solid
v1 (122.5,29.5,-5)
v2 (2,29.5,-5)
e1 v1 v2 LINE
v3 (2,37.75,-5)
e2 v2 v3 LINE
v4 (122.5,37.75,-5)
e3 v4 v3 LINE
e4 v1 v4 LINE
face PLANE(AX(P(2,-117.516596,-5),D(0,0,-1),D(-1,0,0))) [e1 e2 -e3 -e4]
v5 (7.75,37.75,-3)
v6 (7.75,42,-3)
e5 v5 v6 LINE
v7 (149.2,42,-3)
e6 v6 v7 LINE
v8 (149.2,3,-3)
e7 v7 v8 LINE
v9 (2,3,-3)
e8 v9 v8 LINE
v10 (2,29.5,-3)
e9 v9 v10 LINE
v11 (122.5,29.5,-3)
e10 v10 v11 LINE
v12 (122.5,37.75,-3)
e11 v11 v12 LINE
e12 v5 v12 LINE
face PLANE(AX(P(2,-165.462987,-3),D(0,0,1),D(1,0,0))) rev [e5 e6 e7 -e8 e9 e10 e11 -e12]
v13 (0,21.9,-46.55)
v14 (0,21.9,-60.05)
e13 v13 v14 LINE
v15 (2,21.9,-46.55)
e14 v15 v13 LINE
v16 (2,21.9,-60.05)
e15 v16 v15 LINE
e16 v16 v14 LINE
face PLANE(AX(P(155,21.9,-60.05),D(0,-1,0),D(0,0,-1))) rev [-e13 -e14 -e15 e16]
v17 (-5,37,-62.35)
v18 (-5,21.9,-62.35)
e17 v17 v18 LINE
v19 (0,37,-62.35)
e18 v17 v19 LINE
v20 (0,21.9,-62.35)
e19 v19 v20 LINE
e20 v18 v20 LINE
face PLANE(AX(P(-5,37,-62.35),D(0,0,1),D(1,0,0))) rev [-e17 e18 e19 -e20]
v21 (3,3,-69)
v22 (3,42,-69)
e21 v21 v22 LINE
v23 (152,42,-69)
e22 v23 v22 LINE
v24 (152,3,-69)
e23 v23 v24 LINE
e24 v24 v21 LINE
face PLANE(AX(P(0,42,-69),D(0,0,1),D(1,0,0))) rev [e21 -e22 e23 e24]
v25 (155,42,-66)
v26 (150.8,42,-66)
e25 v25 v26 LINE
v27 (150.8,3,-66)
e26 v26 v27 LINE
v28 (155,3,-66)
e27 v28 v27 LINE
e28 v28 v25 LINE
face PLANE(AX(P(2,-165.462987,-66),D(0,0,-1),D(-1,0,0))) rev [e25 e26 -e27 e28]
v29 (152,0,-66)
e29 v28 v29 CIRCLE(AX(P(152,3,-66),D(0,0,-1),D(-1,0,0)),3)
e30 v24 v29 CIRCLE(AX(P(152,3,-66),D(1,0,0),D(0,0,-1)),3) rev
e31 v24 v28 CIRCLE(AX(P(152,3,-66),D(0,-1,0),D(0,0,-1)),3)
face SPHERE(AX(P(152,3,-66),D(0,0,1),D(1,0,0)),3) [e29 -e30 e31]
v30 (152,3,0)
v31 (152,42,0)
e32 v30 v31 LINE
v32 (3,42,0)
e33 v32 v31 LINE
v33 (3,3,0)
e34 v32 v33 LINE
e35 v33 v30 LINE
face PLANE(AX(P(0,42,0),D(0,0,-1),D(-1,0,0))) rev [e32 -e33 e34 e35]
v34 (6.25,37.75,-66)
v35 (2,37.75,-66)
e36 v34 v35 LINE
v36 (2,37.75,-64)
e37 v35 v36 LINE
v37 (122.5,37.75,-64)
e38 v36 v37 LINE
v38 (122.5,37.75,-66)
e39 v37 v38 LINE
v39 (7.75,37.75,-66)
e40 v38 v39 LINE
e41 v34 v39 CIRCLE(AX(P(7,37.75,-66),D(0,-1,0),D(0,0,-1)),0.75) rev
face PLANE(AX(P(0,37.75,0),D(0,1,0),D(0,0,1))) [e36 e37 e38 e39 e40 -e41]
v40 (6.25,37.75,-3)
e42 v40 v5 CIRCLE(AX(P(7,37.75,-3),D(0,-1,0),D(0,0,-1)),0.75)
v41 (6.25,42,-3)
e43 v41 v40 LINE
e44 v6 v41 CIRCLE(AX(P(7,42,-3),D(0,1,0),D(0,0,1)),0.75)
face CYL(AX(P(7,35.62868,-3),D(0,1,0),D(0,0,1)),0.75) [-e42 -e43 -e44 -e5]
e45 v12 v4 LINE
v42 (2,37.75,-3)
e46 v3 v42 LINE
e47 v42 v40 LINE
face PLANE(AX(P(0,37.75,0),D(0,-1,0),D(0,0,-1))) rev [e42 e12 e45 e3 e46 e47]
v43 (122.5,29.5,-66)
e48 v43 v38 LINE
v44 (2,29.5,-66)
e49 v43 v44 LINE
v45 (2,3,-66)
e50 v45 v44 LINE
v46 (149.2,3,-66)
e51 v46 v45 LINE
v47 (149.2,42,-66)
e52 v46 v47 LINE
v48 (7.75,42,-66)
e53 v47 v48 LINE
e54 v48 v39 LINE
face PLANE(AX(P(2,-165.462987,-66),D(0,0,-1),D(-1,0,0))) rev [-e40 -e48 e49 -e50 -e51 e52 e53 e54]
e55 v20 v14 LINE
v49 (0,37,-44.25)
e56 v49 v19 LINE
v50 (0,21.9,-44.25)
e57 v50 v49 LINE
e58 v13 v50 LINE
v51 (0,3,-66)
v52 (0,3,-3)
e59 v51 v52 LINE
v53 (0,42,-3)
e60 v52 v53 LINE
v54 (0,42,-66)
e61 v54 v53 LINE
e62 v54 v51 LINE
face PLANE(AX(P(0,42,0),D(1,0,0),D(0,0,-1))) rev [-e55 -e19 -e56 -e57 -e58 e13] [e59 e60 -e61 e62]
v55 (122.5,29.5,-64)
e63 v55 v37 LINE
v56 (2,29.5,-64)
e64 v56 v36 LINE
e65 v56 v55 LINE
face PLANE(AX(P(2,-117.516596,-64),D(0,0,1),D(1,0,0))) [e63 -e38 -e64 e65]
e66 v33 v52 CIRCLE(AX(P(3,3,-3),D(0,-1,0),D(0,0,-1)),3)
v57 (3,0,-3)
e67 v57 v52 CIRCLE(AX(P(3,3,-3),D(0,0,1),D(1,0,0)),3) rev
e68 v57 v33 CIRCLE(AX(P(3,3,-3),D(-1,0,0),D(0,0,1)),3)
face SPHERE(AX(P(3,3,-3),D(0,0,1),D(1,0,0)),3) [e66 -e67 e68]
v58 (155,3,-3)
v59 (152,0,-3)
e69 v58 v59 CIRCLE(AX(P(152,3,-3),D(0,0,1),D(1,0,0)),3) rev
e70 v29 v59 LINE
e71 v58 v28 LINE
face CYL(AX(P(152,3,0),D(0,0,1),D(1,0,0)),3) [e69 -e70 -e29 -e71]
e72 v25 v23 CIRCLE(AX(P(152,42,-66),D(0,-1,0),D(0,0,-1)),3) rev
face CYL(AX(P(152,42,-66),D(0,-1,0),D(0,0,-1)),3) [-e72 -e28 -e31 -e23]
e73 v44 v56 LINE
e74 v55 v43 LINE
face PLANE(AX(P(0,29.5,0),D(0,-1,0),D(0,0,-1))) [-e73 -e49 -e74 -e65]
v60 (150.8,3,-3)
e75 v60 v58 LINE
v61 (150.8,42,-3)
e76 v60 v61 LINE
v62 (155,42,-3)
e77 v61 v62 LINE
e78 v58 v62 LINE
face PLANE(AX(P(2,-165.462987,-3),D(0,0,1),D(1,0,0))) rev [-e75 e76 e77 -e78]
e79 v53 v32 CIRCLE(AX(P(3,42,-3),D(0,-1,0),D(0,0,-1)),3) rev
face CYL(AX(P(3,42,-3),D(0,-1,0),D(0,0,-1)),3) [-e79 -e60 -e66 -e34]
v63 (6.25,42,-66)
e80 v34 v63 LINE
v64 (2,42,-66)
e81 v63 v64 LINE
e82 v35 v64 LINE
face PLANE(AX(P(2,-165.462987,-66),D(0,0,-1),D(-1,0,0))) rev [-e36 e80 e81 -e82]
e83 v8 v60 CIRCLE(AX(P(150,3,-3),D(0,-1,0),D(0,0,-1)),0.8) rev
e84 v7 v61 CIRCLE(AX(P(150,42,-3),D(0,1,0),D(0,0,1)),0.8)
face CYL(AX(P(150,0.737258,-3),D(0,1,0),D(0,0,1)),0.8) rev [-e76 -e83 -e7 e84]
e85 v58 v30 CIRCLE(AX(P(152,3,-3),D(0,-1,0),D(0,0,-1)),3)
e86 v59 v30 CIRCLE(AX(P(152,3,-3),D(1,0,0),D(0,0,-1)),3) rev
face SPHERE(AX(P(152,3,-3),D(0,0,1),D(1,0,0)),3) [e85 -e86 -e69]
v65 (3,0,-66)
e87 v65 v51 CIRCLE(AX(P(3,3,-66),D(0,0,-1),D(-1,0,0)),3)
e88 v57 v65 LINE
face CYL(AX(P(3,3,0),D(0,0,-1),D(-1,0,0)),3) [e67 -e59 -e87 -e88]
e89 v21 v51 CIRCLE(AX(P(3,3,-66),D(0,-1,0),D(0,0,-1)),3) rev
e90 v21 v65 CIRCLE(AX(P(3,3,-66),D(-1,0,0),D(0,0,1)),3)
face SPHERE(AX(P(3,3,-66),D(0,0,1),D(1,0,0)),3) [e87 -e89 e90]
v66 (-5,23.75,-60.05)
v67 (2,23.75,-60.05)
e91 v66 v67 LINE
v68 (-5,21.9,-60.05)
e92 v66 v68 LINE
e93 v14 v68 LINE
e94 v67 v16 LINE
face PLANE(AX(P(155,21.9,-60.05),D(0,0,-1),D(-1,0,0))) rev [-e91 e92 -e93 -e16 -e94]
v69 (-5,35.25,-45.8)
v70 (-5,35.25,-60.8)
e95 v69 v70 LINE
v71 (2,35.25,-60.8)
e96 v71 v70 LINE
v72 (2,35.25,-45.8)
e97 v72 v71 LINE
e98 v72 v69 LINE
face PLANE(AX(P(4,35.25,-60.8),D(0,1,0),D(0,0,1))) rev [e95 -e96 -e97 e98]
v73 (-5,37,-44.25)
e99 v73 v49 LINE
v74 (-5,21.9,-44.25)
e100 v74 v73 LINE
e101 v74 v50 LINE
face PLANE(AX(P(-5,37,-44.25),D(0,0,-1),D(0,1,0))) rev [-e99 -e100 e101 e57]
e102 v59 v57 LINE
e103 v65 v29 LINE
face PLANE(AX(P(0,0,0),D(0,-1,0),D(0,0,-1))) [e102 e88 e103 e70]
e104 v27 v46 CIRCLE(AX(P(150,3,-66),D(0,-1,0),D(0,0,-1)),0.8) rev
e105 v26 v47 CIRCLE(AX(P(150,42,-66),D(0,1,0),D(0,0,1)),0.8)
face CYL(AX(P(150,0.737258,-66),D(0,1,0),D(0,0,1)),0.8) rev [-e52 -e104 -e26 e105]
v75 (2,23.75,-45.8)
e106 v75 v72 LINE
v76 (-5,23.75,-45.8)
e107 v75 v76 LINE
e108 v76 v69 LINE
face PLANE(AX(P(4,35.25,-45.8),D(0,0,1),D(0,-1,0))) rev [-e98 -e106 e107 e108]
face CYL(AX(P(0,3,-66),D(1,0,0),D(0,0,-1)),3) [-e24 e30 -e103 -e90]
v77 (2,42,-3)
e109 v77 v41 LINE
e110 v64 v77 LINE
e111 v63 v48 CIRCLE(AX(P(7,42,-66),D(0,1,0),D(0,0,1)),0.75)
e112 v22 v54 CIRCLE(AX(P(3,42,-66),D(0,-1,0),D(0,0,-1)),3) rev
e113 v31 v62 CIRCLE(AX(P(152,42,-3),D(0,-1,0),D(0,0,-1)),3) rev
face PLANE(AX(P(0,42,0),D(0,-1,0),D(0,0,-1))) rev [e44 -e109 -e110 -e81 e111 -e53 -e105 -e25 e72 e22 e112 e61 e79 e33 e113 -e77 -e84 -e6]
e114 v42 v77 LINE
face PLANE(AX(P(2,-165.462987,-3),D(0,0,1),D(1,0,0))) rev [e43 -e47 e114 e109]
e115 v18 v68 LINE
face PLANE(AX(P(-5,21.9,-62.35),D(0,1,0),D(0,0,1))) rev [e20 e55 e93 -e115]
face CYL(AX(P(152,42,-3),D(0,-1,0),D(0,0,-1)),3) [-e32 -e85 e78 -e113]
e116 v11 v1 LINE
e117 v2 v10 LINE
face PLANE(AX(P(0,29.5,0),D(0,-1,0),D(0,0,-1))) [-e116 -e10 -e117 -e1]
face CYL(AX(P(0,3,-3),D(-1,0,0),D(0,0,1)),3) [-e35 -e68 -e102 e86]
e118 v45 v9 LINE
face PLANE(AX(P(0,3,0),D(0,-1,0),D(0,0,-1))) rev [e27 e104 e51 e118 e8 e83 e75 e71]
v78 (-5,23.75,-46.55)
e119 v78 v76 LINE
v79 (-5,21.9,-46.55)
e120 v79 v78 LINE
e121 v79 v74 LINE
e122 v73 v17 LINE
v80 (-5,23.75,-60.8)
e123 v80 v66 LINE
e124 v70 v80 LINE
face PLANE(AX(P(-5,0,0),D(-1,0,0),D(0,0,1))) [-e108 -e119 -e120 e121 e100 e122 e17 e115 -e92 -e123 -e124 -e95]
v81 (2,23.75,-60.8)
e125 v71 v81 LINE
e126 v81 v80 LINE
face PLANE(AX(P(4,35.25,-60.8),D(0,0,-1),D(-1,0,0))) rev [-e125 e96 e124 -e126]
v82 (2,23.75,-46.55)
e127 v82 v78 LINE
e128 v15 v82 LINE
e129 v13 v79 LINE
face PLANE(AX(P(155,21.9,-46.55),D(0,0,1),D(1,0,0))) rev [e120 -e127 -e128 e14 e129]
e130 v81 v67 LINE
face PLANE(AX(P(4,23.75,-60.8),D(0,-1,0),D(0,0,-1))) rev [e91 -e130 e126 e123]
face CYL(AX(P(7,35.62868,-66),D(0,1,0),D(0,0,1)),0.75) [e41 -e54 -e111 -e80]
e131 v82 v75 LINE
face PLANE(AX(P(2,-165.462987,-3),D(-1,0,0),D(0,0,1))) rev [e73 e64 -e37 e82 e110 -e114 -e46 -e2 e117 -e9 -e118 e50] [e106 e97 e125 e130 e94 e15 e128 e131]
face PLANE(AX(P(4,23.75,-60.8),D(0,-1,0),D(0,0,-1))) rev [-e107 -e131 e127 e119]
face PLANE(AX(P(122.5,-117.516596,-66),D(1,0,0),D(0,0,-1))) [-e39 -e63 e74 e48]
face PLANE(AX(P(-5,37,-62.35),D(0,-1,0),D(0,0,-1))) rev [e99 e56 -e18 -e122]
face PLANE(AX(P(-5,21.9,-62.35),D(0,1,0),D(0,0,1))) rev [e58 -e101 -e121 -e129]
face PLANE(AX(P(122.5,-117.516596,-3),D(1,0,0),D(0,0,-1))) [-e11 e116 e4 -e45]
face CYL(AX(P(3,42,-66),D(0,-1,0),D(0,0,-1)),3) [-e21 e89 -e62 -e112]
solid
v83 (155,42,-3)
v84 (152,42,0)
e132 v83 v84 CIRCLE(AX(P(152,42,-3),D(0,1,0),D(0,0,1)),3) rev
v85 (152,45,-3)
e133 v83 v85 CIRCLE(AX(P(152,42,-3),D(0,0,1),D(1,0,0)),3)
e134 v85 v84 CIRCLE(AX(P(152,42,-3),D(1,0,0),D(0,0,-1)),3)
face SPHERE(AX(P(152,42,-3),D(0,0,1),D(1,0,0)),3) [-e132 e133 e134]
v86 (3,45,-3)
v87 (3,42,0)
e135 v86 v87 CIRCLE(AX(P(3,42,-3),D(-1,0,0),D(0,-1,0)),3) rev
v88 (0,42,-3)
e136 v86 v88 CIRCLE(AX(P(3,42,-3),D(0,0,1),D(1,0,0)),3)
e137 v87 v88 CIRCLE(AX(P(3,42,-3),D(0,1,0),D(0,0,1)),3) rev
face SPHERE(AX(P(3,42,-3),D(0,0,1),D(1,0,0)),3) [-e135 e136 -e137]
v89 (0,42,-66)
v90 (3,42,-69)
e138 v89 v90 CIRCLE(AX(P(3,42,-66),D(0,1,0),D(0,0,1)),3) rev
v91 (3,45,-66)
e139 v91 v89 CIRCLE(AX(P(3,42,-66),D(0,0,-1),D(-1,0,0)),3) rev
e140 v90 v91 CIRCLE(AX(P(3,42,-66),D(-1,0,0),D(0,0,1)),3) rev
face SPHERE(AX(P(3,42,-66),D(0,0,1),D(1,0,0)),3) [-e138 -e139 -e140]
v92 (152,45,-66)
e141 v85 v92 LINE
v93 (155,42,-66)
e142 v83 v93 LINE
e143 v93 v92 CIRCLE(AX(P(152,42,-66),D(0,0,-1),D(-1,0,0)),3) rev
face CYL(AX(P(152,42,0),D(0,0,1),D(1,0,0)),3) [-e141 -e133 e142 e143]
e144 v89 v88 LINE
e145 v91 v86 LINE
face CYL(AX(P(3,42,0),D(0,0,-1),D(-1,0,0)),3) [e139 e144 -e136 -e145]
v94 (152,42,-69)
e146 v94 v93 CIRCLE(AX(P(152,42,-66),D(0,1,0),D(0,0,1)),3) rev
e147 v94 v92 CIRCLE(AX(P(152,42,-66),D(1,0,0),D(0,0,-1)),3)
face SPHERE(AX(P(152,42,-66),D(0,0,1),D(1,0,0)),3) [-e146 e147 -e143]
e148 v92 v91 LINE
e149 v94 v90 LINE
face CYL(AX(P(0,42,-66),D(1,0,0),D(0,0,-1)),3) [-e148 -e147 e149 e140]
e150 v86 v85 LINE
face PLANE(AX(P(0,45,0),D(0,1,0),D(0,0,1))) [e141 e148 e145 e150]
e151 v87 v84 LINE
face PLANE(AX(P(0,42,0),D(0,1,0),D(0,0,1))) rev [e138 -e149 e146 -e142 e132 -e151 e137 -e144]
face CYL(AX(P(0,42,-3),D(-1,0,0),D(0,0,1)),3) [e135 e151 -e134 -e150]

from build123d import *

# Parameters (mm, degrees)
ESBO_O1_W                = 155
ESBO_O1_H                = 69
RESSALTO_EXTRUS_O1_DEPTH = 42
ESBO_O2_W                = 153
ESBO_O2_H                = 63
CORTE_EXTRUS_O1_DEPTH    = 39
RESSALTO_EXTRUS_O3_START = -4.25
ESBO_O5_W                = 120.5
ESBO_O5_H                = 2
RESSALTO_EXTRUS_O3_DEPTH = 8.25
ESBO_O7_R                = 0.8
CORTE_EXTRUS_O4_DEPTH    = 39
ESBO_O10_R               = 0.75
RESSALTO_EXTRUS_O5_DEPTH = 4.25
ESBO_O9_W                = 155
ESBO_O9_H                = 69
RESSALTO_EXTRUS_O4_DEPTH = 3
FILETE6_R                = 3
FILETE7_R                = 3
ESBO_O11_W               = 18.1
ESBO_O11_H               = 15.1
RESSALTO_EXTRUS_O6_DEPTH = 5
ESBO_O12_W               = 15
ESBO_O12_H               = 11.5
CORTE_EXTRUS_O5_DEPTH    = 9
ESBO_O14_W               = 13.5
ESBO_O14_H               = 1.85
CORTE_EXTRUS_O6_DEPTH    = 180.961106909


with BuildPart() as part:
    # Esboço1 → Ressalto-extrusão1 (new body)
    with BuildSketch(Plane(origin=(0, 0, 0), x_dir=(1, 0, 0), z_dir=(0, 1, 0))):
        with Locations((77.5, 34.5)):
            Rectangle(ESBO_O1_W, ESBO_O1_H)
    extrude(amount=RESSALTO_EXTRUS_O1_DEPTH)

    # Esboço2 → Corte-extrusão1 (cut)
    with BuildSketch(Plane(origin=(0, 42, 0), x_dir=(1, 0, 0), z_dir=(0, 1, 0))):
        with Locations((78.5, 34.5)):
            Rectangle(ESBO_O2_W, ESBO_O2_H)
    extrude(amount=-CORTE_EXTRUS_O1_DEPTH, mode=Mode.SUBTRACT)

    # Esboço5 → Ressalto-extrusão3 (add)
    with BuildSketch(Plane(origin=(0, 42, 0), x_dir=(1, 0, 0), z_dir=(0, 1, 0)).offset(RESSALTO_EXTRUS_O3_START)):
        with Locations((62.25, 4)):
            Rectangle(ESBO_O5_W, ESBO_O5_H)
        with Locations((62.25, 65)):
            Rectangle(ESBO_O5_W, ESBO_O5_H)
    extrude(amount=-RESSALTO_EXTRUS_O3_DEPTH)

    # Esboço7 → Corte-extrusão4 (cut)
    with BuildSketch(Plane(origin=(0, 42, 0), x_dir=(1, 0, 0), z_dir=(0, 1, 0))):
        with Locations((150, 3)):
            Circle(ESBO_O7_R)
        with Locations((150, 66)):
            Circle(ESBO_O7_R)
    extrude(amount=-CORTE_EXTRUS_O4_DEPTH, mode=Mode.SUBTRACT)

    # Esboço10 → Ressalto-extrusão5 (add)
    with BuildSketch(Plane(origin=(0, 42, 0), x_dir=(1, 0, 0), z_dir=(0, 1, 0))):
        with Locations((7, 3)):
            Circle(ESBO_O10_R)
        with Locations((7, 66)):
            Circle(ESBO_O10_R)
    extrude(amount=-RESSALTO_EXTRUS_O5_DEPTH)

    # Filete6
    filete6_edges = [part.edges().sort_by_distance(p)[0] for p in [
        (0, 21, -69),
        (0, 0, -34.5),
        (0, 21, 0),
        (77.5, 0, 0),
        (155, 21, 0),
        (77.5, 0, -69),
        (155, 0, -34.5),
        (155, 21, -69),
    ]]
    fillet(filete6_edges, radius=FILETE6_R - 0.0001)  # a hair under: the kernel refuses the full size

    # Esboço11 → Ressalto-extrusão6 (add)
    with BuildSketch(Plane.ZY):
        with Locations((-53.3, 29.45)):
            Rectangle(ESBO_O11_W, ESBO_O11_H)
    extrude(amount=RESSALTO_EXTRUS_O6_DEPTH)

    # Esboço12 → Corte-extrusão5 (cut)
    with BuildSketch(Plane.ZY.offset(5)):
        with Locations((-53.3, 29.5)):
            Rectangle(ESBO_O12_W, ESBO_O12_H)
    extrude(amount=-CORTE_EXTRUS_O5_DEPTH, mode=Mode.SUBTRACT)

    # Esboço14 → Corte-extrusão6 (cut, through all)
    with BuildSketch(Plane.ZY.offset(5)):
        with Locations((-53.3, 22.825)):
            Rectangle(ESBO_O14_W, ESBO_O14_H)
    extrude(amount=-CORTE_EXTRUS_O6_DEPTH, mode=Mode.SUBTRACT)


with BuildPart() as body_2:
    # Esboço9 → Ressalto-extrusão4 (new body)
    with BuildSketch(Plane(origin=(0, 42, 0), x_dir=(1, 0, 0), z_dir=(0, 1, 0))):
        with Locations((77.5, 34.5)):
            Rectangle(ESBO_O9_W, ESBO_O9_H)
    extrude(amount=RESSALTO_EXTRUS_O4_DEPTH)

    # Filete7
    filete7_edges = [body_2.edges().sort_by_distance(p)[0] for p in [
        (0, 45, -34.5),
        (77.5, 45, 0),
        (155, 45, -34.5),
        (77.5, 45, -69),
        (155, 43.5, 0),
        (0, 43.5, 0),
        (0, 43.5, -69),
        (155, 43.5, -69),
    ]]
    fillet(filete7_edges, radius=FILETE7_R - 0.0001)  # a hair under: the kernel refuses the full size


solid = Compound([part.part, body_2.part])
